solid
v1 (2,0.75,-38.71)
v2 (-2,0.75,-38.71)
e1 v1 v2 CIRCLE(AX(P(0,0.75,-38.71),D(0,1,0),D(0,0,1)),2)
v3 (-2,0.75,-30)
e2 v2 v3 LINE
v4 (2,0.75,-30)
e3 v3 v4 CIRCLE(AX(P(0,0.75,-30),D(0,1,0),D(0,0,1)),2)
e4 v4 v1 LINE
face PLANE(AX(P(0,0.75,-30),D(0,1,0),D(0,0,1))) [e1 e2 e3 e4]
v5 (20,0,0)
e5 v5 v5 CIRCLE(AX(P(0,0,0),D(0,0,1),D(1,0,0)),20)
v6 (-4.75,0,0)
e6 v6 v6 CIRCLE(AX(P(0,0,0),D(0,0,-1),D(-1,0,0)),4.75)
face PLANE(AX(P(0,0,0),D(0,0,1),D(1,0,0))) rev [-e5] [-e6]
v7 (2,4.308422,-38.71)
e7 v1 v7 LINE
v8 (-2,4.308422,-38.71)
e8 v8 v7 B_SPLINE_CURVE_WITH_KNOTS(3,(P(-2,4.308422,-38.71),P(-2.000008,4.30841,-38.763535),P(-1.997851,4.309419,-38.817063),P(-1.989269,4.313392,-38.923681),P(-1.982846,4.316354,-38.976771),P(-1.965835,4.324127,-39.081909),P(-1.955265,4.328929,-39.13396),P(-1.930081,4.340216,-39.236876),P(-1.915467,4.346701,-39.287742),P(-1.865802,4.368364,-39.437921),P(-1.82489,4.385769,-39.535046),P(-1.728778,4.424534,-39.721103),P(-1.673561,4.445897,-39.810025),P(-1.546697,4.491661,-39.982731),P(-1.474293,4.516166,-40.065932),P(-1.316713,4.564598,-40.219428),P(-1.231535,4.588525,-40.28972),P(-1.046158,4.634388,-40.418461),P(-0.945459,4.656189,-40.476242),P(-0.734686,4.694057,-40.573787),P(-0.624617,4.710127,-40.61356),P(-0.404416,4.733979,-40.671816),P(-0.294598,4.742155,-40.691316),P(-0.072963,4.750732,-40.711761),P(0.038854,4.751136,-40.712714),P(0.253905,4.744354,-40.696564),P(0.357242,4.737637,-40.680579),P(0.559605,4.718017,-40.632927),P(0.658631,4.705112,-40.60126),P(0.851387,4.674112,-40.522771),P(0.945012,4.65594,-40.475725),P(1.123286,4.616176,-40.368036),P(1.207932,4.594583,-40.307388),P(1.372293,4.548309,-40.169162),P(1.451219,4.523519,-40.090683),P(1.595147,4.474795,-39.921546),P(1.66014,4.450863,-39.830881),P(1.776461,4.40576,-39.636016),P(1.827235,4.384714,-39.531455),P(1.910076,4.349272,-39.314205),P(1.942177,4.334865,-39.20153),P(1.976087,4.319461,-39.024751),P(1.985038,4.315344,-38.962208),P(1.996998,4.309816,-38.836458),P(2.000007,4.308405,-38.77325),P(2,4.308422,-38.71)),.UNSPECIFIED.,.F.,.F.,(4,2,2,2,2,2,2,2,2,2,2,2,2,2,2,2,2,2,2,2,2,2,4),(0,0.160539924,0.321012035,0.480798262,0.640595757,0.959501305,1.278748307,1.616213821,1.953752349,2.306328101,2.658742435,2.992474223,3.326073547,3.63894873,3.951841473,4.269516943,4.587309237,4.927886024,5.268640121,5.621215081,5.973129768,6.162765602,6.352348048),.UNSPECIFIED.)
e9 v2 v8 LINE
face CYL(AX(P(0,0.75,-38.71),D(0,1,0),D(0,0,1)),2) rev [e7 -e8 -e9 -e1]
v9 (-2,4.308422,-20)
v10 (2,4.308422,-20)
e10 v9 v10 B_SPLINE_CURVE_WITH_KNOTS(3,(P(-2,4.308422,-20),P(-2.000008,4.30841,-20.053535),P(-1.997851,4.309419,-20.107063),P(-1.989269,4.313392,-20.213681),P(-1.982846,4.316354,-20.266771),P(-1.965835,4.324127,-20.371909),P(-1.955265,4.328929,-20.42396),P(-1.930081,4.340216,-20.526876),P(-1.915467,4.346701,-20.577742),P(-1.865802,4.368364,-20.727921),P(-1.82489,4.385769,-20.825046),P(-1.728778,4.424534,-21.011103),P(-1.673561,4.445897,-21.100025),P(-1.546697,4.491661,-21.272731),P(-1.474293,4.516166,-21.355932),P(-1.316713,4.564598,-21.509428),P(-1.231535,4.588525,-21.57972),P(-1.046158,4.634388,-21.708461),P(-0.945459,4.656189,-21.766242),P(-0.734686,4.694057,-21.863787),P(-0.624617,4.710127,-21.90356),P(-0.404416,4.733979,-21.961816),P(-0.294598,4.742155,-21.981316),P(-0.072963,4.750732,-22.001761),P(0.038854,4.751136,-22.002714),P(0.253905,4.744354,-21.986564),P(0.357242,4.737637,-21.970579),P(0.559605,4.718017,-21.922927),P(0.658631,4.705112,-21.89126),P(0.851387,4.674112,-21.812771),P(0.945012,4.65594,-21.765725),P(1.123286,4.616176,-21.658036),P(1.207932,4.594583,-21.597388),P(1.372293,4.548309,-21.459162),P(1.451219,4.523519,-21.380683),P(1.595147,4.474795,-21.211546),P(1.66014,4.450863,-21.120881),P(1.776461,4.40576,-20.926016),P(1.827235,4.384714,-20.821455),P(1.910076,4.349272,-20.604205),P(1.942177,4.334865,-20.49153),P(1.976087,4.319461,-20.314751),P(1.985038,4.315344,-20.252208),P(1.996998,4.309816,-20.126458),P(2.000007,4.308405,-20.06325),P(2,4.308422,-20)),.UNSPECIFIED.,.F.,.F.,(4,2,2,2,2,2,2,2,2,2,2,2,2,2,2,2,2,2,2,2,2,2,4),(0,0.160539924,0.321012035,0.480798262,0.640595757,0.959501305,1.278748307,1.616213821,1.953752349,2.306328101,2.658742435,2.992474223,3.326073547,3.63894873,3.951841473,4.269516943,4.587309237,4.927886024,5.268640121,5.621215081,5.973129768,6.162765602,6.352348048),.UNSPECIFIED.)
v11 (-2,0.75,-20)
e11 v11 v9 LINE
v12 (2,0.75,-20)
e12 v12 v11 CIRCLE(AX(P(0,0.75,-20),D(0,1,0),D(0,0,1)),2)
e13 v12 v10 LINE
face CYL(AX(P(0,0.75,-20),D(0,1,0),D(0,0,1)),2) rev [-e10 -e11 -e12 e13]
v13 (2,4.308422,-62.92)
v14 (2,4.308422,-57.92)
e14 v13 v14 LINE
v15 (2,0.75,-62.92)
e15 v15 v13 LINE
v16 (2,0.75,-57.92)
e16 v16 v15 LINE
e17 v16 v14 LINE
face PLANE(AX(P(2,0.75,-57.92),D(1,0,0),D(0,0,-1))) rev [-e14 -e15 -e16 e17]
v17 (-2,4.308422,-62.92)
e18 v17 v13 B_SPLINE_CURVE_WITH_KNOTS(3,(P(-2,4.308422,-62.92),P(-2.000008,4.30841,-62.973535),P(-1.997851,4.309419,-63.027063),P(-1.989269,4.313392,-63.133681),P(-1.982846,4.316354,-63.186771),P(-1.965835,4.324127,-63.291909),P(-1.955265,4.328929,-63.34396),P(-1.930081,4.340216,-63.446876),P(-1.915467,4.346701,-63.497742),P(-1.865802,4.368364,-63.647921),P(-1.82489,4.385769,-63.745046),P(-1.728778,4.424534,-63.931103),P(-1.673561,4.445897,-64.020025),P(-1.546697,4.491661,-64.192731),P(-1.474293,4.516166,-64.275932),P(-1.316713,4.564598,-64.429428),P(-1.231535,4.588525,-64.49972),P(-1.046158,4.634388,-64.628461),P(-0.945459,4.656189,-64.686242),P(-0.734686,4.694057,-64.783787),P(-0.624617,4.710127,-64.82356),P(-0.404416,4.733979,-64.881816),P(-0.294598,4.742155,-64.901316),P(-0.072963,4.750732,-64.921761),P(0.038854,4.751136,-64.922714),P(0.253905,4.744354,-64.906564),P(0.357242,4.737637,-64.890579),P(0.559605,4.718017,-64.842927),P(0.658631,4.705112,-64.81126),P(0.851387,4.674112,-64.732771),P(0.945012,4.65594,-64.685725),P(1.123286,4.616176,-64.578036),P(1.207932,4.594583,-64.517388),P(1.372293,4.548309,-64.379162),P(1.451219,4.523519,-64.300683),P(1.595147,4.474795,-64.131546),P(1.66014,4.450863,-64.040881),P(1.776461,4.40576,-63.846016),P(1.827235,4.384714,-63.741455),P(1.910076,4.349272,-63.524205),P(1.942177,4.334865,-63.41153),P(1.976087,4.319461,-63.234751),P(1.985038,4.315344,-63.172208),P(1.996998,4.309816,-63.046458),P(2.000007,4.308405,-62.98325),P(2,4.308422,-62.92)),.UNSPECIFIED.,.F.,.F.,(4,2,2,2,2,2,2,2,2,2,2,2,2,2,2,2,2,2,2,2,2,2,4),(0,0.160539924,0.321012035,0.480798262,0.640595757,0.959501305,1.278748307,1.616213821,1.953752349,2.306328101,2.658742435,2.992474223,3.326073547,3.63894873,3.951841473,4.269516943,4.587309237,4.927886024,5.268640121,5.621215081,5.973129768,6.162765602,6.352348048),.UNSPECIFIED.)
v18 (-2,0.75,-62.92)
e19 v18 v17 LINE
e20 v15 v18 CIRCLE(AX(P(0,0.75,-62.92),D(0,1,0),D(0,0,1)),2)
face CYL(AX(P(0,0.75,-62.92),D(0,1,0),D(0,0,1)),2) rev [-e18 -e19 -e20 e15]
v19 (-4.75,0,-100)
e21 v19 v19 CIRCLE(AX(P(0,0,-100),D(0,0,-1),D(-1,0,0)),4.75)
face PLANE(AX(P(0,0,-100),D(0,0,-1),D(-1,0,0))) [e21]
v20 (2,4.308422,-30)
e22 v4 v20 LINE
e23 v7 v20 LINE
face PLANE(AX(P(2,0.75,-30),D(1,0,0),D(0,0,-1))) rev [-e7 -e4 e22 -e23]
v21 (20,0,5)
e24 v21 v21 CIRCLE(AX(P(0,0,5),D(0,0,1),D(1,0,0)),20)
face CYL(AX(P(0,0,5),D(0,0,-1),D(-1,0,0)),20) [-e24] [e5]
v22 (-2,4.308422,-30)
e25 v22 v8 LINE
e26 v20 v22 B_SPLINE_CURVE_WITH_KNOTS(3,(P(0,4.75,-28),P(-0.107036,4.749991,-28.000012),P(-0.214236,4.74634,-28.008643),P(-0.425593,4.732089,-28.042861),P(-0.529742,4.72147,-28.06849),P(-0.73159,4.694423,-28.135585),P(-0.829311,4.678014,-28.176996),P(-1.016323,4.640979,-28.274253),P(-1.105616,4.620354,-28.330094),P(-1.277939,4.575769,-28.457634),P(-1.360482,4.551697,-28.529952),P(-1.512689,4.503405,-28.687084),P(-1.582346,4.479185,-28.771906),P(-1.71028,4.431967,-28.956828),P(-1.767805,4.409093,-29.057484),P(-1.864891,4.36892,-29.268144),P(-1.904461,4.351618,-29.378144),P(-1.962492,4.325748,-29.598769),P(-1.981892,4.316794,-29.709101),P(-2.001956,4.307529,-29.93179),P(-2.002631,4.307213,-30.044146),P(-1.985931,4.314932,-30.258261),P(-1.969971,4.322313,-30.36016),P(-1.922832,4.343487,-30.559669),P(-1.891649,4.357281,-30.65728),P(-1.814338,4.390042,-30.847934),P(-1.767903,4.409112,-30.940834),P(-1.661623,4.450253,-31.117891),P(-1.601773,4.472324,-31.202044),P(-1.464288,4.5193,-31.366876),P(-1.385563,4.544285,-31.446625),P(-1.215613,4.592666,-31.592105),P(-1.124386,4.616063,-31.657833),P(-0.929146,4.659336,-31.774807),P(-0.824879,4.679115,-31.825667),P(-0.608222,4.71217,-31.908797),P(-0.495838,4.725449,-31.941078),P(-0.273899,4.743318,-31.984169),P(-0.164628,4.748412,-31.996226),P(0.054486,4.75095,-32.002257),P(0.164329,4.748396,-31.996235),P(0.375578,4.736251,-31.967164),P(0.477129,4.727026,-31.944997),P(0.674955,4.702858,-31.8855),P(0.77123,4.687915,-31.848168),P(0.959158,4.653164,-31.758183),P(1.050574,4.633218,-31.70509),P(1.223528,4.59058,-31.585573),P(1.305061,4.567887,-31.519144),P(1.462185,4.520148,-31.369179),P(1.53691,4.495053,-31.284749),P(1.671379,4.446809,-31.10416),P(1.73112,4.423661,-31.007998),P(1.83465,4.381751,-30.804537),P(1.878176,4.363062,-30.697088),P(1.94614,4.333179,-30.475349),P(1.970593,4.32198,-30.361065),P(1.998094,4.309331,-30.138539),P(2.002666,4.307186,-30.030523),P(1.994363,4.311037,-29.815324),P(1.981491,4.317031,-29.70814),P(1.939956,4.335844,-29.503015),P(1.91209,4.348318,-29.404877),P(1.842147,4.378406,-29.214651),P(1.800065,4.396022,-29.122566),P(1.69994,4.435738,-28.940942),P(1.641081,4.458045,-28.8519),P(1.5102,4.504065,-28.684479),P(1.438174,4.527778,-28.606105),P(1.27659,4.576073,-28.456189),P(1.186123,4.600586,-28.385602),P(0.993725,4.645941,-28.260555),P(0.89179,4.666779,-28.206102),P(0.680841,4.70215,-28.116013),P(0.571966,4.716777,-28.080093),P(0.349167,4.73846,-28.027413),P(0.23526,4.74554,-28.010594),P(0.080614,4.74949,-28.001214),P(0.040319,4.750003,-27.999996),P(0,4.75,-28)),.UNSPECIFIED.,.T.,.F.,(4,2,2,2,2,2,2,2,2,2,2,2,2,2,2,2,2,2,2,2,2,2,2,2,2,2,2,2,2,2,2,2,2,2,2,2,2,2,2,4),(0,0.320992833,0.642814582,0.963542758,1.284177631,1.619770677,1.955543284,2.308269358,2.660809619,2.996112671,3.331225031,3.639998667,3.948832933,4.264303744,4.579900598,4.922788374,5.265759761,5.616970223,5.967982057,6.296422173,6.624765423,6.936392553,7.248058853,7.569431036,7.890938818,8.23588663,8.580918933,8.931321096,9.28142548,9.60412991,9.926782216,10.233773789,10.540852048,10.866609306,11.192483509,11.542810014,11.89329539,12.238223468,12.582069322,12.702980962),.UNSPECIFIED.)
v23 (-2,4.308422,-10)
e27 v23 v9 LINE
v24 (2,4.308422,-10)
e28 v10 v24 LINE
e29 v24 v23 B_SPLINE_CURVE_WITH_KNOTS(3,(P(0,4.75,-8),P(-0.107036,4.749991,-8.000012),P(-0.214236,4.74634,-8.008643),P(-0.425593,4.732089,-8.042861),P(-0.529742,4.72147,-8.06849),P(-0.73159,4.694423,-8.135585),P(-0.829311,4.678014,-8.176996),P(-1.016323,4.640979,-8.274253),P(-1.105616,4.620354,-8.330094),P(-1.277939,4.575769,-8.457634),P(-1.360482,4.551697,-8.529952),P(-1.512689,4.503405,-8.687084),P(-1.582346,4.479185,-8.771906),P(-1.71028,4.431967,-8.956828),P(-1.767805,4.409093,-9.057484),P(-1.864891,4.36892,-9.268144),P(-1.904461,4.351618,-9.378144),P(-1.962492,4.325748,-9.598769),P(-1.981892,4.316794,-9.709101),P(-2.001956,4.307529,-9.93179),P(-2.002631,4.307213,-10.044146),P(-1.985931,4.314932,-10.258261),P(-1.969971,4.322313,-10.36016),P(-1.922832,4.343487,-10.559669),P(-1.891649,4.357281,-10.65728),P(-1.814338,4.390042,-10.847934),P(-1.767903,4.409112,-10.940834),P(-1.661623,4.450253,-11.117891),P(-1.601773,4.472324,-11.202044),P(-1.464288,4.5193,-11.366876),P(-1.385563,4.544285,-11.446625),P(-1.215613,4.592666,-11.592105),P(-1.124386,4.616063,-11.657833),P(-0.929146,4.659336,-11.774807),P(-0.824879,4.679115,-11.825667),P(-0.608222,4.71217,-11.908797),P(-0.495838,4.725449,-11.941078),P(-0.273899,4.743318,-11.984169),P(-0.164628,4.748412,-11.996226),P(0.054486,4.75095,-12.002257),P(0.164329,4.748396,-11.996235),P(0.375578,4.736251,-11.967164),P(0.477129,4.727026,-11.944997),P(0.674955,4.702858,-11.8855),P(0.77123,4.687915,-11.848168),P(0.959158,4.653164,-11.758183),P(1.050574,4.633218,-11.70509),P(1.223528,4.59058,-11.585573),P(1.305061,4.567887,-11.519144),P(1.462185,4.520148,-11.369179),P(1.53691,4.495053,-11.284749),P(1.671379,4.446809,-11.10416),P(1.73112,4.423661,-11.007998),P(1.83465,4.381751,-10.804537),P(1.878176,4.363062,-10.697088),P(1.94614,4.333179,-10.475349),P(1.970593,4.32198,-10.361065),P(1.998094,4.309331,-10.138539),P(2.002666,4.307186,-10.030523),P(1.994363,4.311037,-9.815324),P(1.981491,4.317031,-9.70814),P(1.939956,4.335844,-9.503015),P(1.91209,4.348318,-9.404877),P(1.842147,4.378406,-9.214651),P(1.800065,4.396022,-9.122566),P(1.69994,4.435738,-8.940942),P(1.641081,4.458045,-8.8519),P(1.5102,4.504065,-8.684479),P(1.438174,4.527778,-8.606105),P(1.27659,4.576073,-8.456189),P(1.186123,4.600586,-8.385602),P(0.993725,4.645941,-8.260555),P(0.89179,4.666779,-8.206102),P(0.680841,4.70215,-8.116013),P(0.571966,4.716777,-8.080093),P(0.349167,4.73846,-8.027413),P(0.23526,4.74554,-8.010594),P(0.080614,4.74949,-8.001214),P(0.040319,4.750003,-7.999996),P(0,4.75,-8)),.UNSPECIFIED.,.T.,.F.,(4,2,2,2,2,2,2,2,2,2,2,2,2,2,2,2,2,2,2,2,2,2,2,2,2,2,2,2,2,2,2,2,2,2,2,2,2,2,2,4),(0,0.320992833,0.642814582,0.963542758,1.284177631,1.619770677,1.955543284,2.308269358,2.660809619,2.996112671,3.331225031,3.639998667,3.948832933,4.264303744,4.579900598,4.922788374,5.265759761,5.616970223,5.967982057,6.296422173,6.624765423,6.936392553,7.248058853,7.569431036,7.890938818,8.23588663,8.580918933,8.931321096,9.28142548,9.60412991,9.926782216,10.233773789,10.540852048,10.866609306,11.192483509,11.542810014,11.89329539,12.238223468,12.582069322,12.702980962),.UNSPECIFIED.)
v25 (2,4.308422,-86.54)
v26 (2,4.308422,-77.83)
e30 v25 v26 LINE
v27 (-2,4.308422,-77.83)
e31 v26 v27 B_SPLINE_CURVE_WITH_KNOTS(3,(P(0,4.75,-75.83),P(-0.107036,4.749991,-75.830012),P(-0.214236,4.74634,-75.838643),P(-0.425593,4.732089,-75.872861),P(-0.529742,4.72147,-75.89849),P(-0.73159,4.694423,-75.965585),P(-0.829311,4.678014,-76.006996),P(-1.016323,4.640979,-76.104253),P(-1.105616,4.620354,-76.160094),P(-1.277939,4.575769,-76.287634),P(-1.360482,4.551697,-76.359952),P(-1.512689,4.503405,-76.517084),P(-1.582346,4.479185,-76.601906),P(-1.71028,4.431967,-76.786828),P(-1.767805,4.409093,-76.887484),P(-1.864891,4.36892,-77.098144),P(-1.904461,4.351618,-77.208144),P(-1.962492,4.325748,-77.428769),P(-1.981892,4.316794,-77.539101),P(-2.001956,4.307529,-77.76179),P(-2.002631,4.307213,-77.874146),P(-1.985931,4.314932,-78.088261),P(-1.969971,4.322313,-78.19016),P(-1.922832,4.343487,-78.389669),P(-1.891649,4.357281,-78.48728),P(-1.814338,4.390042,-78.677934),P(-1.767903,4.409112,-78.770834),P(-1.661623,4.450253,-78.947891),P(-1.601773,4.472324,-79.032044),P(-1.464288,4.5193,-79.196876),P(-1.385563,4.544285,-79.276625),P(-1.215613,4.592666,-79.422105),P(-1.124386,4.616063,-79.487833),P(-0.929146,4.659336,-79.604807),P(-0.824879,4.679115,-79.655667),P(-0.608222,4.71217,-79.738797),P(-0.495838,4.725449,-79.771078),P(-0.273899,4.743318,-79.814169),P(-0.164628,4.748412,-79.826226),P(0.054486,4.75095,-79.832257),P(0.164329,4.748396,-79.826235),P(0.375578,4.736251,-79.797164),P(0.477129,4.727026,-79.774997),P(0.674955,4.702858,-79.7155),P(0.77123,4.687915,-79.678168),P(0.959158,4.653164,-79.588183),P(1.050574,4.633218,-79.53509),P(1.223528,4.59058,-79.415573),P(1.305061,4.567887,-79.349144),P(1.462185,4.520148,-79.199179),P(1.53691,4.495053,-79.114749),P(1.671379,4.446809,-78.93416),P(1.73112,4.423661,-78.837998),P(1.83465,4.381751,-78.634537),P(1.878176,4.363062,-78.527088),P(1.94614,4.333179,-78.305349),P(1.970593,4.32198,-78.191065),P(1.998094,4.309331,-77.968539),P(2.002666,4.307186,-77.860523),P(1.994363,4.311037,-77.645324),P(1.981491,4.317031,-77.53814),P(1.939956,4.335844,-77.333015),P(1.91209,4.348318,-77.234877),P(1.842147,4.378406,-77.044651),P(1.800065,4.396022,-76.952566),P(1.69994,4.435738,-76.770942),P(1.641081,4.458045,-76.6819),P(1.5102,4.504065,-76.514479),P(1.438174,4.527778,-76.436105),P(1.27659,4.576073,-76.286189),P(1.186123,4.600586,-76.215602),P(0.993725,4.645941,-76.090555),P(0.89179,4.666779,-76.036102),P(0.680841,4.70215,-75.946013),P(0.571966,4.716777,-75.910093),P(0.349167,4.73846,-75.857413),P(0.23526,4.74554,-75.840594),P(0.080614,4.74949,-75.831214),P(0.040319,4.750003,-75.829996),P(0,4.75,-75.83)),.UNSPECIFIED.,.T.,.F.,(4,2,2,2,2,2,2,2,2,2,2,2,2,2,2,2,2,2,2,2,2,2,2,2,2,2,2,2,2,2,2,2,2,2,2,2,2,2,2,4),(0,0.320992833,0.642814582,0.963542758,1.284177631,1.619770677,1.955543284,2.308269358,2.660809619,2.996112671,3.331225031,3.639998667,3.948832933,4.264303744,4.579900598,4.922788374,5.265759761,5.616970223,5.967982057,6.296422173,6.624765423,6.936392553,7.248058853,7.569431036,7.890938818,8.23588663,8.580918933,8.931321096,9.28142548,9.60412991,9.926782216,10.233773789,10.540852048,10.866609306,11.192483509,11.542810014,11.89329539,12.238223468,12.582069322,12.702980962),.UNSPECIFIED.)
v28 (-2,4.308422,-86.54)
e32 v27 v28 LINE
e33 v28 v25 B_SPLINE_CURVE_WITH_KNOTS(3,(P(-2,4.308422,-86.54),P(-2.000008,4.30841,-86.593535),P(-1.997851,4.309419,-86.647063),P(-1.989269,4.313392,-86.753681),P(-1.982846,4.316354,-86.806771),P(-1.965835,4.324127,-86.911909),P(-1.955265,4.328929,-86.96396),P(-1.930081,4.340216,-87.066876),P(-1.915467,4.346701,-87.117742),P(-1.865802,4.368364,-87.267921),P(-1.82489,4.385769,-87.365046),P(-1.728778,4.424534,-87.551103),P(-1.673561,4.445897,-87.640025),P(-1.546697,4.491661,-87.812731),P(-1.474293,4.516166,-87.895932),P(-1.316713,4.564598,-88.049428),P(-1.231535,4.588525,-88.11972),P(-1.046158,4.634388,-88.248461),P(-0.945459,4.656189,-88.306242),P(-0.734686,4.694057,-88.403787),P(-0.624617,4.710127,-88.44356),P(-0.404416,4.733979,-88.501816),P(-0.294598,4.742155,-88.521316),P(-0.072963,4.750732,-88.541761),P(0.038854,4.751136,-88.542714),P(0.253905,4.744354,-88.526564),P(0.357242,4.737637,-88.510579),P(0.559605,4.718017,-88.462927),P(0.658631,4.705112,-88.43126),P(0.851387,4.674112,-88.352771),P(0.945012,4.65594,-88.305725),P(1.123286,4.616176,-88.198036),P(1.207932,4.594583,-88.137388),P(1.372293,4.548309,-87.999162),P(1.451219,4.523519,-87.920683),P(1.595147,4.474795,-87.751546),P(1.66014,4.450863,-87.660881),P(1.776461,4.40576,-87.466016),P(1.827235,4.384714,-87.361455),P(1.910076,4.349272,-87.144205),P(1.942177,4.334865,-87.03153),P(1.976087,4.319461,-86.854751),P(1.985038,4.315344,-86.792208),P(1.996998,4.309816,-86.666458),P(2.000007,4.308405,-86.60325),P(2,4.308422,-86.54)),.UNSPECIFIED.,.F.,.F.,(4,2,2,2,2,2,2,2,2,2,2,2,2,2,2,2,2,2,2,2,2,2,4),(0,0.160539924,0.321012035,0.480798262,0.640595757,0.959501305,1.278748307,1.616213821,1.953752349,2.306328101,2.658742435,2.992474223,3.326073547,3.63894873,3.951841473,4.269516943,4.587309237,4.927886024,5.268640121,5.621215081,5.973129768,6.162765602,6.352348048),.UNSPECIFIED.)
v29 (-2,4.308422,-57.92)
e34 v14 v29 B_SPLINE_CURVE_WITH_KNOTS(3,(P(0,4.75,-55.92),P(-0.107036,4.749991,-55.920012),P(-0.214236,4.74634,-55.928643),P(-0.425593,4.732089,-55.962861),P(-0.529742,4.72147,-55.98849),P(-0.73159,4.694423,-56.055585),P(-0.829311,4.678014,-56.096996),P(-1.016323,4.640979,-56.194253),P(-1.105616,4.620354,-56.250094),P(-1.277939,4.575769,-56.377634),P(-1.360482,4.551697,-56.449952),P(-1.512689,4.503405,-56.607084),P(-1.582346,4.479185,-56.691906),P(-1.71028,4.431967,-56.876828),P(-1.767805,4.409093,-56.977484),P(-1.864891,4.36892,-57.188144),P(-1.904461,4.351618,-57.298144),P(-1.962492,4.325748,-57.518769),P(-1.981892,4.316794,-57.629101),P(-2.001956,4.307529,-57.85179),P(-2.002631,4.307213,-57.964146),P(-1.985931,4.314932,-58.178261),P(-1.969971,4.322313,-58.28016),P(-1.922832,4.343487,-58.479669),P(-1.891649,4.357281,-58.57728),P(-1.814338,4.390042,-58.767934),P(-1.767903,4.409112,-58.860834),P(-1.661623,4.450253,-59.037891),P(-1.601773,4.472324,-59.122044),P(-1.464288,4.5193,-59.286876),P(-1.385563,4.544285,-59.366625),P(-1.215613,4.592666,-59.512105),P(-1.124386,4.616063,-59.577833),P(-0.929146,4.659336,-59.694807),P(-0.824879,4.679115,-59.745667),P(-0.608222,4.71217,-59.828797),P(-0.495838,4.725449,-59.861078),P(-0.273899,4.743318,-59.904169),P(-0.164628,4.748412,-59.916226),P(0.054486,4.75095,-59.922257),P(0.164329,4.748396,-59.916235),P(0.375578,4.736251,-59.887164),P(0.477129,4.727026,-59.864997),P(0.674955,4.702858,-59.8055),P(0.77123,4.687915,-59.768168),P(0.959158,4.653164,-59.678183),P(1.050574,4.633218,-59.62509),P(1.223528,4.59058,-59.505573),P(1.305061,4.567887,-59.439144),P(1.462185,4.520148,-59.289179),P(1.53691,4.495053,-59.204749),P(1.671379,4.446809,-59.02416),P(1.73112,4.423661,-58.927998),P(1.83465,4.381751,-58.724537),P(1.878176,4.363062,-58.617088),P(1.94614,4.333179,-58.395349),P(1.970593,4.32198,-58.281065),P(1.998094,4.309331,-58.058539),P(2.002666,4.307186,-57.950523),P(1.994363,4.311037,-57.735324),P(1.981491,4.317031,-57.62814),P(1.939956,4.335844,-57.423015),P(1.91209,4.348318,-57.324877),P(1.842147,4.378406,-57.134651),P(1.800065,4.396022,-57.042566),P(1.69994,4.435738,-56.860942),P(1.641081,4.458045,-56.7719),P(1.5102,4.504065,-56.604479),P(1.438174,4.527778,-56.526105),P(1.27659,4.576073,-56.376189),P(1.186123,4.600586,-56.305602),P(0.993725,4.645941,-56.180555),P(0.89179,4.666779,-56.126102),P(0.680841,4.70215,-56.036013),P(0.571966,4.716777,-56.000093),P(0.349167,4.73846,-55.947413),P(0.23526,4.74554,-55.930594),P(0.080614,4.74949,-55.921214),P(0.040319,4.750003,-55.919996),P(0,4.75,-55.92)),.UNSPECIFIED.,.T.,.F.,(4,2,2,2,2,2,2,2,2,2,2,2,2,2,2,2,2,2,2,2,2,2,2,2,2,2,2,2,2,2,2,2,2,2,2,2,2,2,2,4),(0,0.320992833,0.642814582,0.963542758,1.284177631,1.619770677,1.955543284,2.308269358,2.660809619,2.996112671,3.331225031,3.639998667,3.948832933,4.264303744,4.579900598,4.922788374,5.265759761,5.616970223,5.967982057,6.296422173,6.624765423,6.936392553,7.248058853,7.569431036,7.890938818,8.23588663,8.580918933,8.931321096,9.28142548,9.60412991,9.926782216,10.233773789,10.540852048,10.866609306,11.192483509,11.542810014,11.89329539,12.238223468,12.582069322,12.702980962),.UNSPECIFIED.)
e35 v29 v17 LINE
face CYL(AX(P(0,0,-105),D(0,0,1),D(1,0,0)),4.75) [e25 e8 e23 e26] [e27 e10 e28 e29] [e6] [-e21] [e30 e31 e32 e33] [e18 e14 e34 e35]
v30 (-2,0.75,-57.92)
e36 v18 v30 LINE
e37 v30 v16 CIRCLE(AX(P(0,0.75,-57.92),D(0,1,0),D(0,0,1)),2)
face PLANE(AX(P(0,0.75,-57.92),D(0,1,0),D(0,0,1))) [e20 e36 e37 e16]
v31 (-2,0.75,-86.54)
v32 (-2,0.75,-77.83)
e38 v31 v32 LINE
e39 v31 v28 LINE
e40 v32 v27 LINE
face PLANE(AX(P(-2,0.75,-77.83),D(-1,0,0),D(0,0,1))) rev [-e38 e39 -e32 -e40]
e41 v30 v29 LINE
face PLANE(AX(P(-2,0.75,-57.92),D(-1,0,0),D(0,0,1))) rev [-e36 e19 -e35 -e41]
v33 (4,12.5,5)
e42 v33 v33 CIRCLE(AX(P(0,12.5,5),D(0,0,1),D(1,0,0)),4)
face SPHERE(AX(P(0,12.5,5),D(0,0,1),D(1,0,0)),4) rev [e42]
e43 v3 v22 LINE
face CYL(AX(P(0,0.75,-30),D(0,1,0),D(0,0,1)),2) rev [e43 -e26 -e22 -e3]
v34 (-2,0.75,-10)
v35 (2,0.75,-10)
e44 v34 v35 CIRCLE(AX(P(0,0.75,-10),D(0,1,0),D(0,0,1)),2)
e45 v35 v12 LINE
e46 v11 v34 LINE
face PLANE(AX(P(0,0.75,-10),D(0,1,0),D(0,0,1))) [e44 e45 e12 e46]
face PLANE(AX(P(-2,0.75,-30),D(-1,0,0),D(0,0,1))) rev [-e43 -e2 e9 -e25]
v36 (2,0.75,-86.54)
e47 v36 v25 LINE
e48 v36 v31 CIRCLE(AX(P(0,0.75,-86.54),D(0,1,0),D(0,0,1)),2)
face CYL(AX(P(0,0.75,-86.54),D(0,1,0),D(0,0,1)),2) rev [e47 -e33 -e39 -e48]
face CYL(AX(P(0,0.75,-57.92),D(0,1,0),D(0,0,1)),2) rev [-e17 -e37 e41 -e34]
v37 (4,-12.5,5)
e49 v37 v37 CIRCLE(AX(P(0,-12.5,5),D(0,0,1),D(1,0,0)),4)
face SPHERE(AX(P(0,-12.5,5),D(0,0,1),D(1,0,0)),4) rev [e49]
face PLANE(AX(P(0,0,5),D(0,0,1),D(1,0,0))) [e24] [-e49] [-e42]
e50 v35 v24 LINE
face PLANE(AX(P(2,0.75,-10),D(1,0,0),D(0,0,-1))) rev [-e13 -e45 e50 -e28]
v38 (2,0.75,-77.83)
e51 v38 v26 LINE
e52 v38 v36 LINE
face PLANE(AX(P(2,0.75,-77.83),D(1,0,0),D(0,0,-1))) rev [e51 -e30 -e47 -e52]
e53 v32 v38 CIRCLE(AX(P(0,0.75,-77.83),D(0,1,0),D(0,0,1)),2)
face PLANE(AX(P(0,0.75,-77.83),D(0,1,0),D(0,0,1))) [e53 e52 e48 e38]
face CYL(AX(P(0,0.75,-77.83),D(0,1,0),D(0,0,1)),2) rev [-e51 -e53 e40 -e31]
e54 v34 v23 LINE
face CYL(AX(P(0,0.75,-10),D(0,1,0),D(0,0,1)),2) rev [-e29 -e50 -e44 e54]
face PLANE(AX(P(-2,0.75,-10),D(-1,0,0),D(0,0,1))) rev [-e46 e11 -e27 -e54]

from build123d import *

# Parameters (mm, degrees)
SKETCH1_R           = 20
BOSS_EXTRUDE1_DEPTH = 5
SKETCH3_R           = 4
CUT_EXTRUDE2_DEPTH  = 4
FILLET2_R           = 4
SKETCH4_R           = 4.75
BOSS_EXTRUDE2_DEPTH = 105
CUT_EXTRUDE3_DEPTH  = 4
CUT_EXTRUDE4_START  = -5
SKETCH6_R           = 4.75
CUT_EXTRUDE4_DEPTH  = 5


with BuildPart() as part:
    # Sketch1 → Boss-Extrude1 (new body)
    with BuildSketch(Plane.XY):
        Circle(SKETCH1_R)
    extrude(amount=BOSS_EXTRUDE1_DEPTH)

    # Sketch3 → Cut-Extrude2 (cut)
    with BuildSketch(Plane.XY.offset(5)):
        with Locations((0, 12.5)):
            Circle(SKETCH3_R)
        with Locations((0, -12.5)):
            Circle(SKETCH3_R)
    extrude(amount=-CUT_EXTRUDE2_DEPTH, mode=Mode.SUBTRACT)

    # Fillet2
    fillet2_edges = [part.edges().sort_by_distance(p)[0] for p in [
        (-4, 12.5, 1),
        (-4, -12.5, 1),
    ]]
    fillet(fillet2_edges, radius=FILLET2_R - 0.0001)  # a hair under: the kernel refuses the full size

    # Sketch4 → Boss-Extrude2 (add)
    with BuildSketch(Plane(origin=(0, 0, 0), x_dir=(-1, 0, 0), z_dir=(0, 0, -1))):
        Circle(SKETCH4_R)
    extrude(amount=BOSS_EXTRUDE2_DEPTH)

    # Sketch5 → Cut-Extrude3 (cut)
    with BuildSketch(Plane(origin=(0, 4.75, 0), x_dir=(1, 0, 0), z_dir=(0, 1, 0))):
        with BuildLine():
            Line((-2, 10), (-2, 20))
            ThreePointArc((-2, 20), (0, 22), (2, 20))
            Line((2, 20), (2, 10))
            ThreePointArc((2, 10), (0, 8), (-2, 10))
        make_face()
        with BuildLine():
            Line((-2, 30), (-2, 38.71))
            ThreePointArc((-2, 38.71), (0, 40.71), (2, 38.71))
            Line((2, 38.71), (2, 30))
            ThreePointArc((2, 30), (0, 28), (-2, 30))
        make_face()
        with BuildLine():
            Line((-2, 77.83), (-2, 86.54))
            ThreePointArc((-2, 86.54), (0, 88.54), (2, 86.54))
            Line((2, 86.54), (2, 77.83))
            ThreePointArc((2, 77.83), (0, 75.83), (-2, 77.83))
        make_face()
        with BuildLine():
            Line((-2, 57.92), (-2, 62.92))
            ThreePointArc((-2, 62.92), (0, 64.92), (2, 62.92))
            Line((2, 62.92), (2, 57.92))
            ThreePointArc((2, 57.92), (0, 55.92), (-2, 57.92))
        make_face()
    extrude(amount=-CUT_EXTRUDE3_DEPTH, mode=Mode.SUBTRACT)

    # Sketch6 → Cut-Extrude4 (cut)
    with BuildSketch(Plane(origin=(0, 0, -105), x_dir=(-1, 0, 0), z_dir=(0, 0, -1)).offset(CUT_EXTRUDE4_START)):
        Circle(SKETCH6_R)
    extrude(amount=CUT_EXTRUDE4_DEPTH, mode=Mode.SUBTRACT)


solid = part.part
